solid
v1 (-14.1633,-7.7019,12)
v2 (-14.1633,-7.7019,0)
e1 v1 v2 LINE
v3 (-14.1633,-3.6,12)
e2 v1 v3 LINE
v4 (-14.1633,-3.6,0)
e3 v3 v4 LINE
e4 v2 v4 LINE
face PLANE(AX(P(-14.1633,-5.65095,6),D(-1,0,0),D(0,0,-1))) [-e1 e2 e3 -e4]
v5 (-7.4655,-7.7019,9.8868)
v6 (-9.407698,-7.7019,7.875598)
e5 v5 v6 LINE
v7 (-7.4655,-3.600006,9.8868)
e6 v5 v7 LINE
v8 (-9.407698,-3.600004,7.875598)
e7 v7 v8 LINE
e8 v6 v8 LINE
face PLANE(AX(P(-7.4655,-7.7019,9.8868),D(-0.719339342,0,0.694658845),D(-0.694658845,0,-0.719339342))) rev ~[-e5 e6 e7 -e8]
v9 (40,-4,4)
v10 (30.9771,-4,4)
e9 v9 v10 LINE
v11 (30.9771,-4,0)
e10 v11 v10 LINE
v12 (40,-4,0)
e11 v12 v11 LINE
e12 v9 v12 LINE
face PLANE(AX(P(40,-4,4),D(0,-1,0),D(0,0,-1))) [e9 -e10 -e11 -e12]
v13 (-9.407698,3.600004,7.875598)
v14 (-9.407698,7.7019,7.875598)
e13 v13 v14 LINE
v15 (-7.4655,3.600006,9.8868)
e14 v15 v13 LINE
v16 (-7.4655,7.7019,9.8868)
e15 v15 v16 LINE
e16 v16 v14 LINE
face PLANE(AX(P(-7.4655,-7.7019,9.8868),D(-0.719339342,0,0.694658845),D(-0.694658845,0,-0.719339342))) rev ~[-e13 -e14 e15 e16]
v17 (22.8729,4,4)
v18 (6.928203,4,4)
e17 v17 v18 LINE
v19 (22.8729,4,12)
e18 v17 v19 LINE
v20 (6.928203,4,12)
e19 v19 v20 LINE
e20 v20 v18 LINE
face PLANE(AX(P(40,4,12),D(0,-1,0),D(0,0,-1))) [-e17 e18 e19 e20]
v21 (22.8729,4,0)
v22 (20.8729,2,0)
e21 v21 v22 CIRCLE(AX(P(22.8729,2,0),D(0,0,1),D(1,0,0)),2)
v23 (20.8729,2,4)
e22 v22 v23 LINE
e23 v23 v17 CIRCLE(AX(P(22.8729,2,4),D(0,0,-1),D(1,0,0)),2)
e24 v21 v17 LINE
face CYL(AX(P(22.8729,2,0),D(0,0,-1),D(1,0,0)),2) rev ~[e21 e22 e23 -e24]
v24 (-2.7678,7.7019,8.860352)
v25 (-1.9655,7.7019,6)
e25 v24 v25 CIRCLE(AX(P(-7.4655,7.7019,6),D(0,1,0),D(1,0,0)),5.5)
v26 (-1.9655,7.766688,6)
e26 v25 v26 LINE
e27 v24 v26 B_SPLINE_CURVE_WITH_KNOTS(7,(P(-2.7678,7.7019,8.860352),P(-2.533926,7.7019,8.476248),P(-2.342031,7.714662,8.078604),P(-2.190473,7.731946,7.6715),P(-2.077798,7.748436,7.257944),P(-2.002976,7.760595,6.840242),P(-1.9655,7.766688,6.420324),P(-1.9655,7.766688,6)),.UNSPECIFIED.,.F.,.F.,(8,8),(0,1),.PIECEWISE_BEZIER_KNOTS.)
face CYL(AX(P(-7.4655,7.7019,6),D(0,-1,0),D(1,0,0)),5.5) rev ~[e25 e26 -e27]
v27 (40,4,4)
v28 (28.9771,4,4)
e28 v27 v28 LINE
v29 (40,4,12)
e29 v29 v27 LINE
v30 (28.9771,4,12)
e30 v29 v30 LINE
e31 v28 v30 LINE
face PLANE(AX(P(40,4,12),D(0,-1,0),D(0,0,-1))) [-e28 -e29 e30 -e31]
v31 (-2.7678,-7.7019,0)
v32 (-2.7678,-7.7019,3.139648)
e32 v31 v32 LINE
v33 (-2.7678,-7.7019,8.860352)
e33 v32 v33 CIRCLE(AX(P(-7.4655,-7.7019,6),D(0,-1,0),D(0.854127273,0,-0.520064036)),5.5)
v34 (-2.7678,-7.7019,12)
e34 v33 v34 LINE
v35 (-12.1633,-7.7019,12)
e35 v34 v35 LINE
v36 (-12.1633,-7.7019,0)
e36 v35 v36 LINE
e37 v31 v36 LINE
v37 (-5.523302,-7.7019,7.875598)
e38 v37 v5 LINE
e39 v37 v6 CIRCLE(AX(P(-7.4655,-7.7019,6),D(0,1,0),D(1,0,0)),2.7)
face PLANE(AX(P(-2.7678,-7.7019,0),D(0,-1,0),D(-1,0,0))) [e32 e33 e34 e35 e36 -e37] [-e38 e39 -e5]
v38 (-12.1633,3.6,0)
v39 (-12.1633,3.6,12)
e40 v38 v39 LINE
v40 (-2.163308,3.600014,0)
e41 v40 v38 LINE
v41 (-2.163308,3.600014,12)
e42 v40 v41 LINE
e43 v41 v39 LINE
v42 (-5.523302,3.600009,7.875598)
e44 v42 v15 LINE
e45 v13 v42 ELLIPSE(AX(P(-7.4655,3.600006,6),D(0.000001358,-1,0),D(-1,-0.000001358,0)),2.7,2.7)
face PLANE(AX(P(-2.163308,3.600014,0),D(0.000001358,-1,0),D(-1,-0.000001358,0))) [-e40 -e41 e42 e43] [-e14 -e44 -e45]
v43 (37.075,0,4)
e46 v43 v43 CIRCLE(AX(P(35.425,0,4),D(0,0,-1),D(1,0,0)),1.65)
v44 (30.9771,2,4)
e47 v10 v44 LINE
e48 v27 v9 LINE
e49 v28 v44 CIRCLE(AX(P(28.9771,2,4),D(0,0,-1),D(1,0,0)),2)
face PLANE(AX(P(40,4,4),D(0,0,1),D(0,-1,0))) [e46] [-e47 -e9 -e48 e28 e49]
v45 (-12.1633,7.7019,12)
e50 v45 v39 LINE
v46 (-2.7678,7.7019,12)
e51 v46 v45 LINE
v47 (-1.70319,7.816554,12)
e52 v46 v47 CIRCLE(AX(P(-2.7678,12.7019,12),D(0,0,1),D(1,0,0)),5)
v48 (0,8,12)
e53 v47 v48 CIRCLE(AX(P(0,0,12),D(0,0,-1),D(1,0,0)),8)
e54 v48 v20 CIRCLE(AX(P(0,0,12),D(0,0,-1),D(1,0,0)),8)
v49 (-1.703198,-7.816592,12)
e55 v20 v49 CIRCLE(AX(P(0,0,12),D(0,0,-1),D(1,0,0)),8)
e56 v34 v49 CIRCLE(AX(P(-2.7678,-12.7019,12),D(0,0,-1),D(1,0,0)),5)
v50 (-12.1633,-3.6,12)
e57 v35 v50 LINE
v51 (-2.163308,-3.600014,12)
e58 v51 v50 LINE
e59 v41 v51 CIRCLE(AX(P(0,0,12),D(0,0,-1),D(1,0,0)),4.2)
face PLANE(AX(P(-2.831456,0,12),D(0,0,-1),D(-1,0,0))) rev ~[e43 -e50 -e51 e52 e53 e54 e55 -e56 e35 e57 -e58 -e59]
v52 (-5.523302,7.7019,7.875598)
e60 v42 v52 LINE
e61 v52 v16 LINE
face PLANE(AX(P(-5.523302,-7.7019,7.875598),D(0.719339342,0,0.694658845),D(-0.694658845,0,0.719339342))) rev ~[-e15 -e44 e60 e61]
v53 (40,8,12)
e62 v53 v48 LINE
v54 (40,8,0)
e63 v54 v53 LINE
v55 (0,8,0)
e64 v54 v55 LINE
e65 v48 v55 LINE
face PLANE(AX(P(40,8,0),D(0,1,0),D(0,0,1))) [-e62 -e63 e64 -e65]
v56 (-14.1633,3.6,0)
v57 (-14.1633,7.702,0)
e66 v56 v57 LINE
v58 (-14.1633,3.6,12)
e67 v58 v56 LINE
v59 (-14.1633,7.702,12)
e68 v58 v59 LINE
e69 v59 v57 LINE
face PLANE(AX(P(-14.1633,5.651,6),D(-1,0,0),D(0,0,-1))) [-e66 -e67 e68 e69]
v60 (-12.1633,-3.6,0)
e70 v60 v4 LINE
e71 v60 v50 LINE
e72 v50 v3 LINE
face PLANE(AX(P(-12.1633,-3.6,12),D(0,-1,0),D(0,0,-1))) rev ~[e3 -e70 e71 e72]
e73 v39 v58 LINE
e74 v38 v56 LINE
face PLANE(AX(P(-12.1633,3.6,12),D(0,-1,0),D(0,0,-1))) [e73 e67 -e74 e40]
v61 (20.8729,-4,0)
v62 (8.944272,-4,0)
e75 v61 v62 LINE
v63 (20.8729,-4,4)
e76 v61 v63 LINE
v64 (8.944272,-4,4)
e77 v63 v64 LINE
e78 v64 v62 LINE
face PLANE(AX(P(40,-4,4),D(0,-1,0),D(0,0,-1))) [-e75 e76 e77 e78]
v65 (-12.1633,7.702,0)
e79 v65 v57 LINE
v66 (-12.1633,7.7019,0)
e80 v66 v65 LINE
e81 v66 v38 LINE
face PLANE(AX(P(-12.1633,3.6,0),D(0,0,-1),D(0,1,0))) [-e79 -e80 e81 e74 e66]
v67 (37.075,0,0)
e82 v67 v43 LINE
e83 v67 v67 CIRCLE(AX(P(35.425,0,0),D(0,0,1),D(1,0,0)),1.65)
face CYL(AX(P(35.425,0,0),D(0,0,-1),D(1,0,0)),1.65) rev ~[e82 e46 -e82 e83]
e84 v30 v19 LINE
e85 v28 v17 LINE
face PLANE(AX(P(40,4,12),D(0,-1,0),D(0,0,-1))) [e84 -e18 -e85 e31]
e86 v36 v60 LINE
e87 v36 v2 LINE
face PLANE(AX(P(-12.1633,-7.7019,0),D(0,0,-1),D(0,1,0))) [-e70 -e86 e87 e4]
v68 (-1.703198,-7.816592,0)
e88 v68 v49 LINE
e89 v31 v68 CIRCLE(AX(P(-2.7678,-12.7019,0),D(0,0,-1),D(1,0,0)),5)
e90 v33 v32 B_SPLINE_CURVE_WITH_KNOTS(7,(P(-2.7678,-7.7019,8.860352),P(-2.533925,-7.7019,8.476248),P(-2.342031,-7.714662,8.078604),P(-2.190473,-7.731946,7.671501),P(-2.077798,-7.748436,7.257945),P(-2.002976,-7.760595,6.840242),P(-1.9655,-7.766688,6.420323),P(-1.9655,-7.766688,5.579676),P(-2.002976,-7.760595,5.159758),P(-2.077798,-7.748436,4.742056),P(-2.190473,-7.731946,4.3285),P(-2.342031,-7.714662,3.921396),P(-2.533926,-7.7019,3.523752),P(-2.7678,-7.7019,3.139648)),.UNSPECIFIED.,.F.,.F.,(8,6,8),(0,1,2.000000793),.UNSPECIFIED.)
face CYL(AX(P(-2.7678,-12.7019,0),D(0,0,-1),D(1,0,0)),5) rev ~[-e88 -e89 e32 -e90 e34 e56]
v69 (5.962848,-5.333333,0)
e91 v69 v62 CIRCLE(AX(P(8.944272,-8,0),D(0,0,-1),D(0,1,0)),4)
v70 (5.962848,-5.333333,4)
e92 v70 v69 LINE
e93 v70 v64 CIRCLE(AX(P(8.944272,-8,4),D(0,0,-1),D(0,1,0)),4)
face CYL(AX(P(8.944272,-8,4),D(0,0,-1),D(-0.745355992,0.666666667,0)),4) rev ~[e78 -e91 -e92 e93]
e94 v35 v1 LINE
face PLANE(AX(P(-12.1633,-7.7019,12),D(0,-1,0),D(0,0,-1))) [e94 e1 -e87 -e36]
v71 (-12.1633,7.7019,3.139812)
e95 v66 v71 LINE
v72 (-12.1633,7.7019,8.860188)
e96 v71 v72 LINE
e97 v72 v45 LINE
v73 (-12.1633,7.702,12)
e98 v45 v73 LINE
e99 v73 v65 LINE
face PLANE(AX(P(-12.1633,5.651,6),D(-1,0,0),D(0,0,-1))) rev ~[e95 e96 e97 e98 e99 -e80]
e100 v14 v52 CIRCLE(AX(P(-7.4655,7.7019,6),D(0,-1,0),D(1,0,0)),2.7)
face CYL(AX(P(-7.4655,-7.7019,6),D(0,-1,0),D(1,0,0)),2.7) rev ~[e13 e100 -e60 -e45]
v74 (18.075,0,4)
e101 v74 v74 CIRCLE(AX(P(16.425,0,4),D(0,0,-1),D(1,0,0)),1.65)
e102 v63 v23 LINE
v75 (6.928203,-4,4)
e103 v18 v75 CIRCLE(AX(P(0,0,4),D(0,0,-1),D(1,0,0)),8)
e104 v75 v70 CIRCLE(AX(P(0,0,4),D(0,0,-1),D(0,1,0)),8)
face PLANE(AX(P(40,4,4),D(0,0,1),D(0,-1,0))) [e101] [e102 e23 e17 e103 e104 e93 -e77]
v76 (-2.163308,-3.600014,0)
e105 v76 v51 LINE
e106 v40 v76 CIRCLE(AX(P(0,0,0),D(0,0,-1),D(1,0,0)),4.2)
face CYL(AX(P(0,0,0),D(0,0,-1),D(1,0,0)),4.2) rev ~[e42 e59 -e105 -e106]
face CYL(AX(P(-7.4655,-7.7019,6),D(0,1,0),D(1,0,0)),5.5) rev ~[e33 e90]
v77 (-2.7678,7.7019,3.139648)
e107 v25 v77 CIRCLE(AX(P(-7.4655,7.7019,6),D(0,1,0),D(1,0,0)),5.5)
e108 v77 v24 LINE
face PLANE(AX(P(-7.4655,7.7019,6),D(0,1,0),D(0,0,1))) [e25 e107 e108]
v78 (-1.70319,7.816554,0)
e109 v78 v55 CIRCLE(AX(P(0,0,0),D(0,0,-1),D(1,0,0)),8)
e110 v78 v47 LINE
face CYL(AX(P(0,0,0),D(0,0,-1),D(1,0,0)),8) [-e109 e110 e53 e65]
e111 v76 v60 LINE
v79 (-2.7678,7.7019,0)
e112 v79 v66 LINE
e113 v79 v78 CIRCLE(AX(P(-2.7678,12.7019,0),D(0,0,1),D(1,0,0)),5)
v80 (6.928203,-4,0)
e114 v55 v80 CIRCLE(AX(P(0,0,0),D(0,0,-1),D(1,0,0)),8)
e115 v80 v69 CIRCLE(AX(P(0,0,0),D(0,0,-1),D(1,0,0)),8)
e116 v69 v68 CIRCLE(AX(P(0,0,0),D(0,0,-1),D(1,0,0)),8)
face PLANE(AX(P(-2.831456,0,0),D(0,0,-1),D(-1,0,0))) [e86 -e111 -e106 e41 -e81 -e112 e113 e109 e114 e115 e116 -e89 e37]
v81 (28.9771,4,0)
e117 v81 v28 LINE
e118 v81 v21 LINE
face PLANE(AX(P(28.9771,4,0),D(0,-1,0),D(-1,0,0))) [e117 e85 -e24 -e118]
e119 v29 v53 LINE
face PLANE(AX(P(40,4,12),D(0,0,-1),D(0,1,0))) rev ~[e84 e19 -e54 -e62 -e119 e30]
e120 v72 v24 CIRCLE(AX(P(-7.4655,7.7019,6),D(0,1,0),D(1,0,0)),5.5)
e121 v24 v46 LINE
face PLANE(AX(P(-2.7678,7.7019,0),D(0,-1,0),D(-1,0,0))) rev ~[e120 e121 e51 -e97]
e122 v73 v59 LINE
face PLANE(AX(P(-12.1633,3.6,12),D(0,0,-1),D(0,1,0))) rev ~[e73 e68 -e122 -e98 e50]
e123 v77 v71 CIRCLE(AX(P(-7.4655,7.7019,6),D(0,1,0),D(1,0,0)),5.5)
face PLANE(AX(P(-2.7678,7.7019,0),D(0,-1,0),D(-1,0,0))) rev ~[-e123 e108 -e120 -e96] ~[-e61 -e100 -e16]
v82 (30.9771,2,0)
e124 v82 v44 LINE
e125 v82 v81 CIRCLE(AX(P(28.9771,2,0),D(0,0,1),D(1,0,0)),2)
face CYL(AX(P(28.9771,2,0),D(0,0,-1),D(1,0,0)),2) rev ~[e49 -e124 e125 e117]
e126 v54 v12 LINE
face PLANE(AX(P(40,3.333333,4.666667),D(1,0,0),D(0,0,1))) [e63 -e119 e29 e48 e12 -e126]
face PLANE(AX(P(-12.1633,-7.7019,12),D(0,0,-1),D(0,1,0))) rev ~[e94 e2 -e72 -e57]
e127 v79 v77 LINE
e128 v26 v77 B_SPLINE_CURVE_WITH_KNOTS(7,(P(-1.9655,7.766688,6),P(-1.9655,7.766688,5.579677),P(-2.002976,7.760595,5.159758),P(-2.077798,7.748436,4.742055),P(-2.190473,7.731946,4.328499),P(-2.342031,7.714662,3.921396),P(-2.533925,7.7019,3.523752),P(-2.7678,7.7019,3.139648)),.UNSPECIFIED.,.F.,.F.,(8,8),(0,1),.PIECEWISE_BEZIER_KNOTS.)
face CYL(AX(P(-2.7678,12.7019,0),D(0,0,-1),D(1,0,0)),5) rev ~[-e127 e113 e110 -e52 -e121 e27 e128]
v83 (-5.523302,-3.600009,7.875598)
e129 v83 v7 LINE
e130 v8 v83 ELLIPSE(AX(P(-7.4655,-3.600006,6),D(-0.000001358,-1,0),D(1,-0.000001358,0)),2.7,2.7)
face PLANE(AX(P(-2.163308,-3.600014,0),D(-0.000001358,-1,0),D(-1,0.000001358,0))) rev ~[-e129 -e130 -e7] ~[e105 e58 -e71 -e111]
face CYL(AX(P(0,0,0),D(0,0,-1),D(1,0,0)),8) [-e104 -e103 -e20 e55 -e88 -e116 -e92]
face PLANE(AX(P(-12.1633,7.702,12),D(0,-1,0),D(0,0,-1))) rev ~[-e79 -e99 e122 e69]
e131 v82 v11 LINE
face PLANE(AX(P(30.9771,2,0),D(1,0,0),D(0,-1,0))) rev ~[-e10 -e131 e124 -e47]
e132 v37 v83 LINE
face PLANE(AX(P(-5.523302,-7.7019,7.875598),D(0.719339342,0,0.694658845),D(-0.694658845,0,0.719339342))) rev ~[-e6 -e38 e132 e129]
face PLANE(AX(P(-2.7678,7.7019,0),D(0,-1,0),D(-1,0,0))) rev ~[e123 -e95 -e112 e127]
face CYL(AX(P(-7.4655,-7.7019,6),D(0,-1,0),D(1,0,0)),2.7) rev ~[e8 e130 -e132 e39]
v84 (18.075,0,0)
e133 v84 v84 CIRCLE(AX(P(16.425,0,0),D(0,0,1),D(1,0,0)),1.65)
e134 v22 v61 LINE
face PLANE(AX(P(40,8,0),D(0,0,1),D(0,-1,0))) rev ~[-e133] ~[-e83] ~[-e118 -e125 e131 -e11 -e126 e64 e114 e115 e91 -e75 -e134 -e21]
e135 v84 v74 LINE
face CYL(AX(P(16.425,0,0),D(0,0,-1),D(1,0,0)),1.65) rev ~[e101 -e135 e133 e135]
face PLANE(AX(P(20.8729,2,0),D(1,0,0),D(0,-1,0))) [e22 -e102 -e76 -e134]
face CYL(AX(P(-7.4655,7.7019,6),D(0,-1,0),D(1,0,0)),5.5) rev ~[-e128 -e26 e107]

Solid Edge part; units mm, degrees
sketch "Sketch1" plane through (0, 0, 0) normal (0, 0, 1) x (1, 0, 0)
  line L0 (-2.7678, -7.7019) -> (-12.1633, -7.7019)
  line L1 (-12.1633, -7.7019) -> (-12.1633, -3.6)
  line L2 (-2.1633, -3.6) -> (-12.1633, -3.6)
  arc A0 (-2.1633, 3.6) -> (-2.1633, -3.6) centre (0, 0) cw
  line L3 (-2.1633, 3.6) -> (-12.1633, 3.6)
  line L4 (-12.1633, 7.7019) -> (-12.1633, 3.6)
  line L5 (-2.7678, 7.7019) -> (-12.1633, 7.7019)
  arc A1 (-2.7678, 7.7019) -> (-1.7032, 7.8166) centre (-2.7678, 12.7019) ccw
  arc A2 (-1.7032, 7.8166) -> (-1.7032, -7.8166) centre (0, 0) cw
  arc A3 (-2.7678, -7.7019) -> (-1.7032, -7.8166) centre (-2.7678, -12.7019) cw
extrude "Protrusion1" add sketch "Sketch1" along normal blind 12
sketch "Sketch2" plane through (-7.4655, -7.7019, 6) normal (0, -1, 0) x (1, 0, 0)
  circle A0 centre (0, 0) radius 5.5
extrude "Cutout1" cut sketch "Sketch2" along normal through all
sketch "Sketch3" plane through (-7.4655, -7.7019, 6) normal (0, -1, 0) x (1, 0, 0)
  line L0 (0, 3.8868) -> (-1.9422, 1.8756)
  line L1 (1.9422, 1.8756) -> (0, 3.8868)
  arc A0 (1.9422, 1.8756) -> (-1.9422, 1.8755) centre (0, 0) cw
extrude "Cutout2" cut sketch "Sketch3" against normal through all
sketch "Sketch4" plane through (40, 0, 0) normal (1, 0, 0) x (0, 1, 0)
  line L0 (8, 0) -> (8, 12)
  line L1 (4, 12) -> (8, 12)
  line L2 (4, 12) -> (4, 4)
  line L3 (4, 4) -> (-4, 4)
  line L4 (-4, 4) -> (-4, 0)
  line L5 (8, 0) -> (-4, 0)
  dimension "D1" = 4
  dimension "D2" = 12
extrude "ExtrudedProtrusion_2" add sketch "Sketch4" against normal up to next
sketch "Sketch5" plane through (-7.4655, 7.7019, 6) normal (0, 1, 0) x (1, 0, 0)
  circle A0 centre (0, 0) radius 5.5
extrude "Cutout3" cut sketch "Sketch5" along normal through all
fillet "Round_1" radius 4 1 edges at (6.9282, -4, 2)
sketch "Sketch6" plane through (0, 0, 0) normal (0, 0, 1) x (1, 0, 0)
  arc A0 (22.8729, 4) -> (20.8729, 2) centre (22.8729, 2) ccw
  line L0 (28.9771, 4) -> (22.8729, 4)
  arc A1 (30.9771, 2) -> (28.9771, 4) centre (28.9771, 2) ccw
  line L1 (30.9771, 2) -> (30.9771, -5.7679)
  line L2 (20.8729, 2) -> (20.8729, -5.7679)
extrude "Cutout4" cut sketch "Sketch6" along normal through all material side at (21.494, 3.3789, 0)
sketch "Sketch7" plane through (0, 0, 0) normal (0, 0, 1) x (1, 0, 0)
  circle A0 centre (16.425, 0) radius 1.65
  circle A1 centre (35.425, 0) radius 1.65
  dimension "D1" = 3.3
  dimension "D2" = 19
  dimension "D3" = 9.5
extrude "Cutout5" cut sketch "Sketch7" along normal through all
sketch "Sketch8" plane through (-12.1633, 5.651, 6) normal (-1, 0, 0) x (0, -1, 0)
  line L0 (2.051, 6) -> (-2.051, 6)
  line L1 (-2.051, 6) -> (-2.051, -6)
  line L2 (2.051, -6) -> (-2.051, -6)
  line L3 (2.051, 6) -> (2.051, -6)
  line L4 (9.251, 6) -> (9.251, -6)
  line L5 (13.3529, -6) -> (9.251, -6)
  line L6 (13.3529, 6) -> (13.3529, -6)
  line L7 (13.3529, 6) -> (9.251, 6)
extrude "ExtrudedProtrusion_3" add sketch "Sketch8" along normal blind 2
properties material "ABS Plastic, medium impact"
